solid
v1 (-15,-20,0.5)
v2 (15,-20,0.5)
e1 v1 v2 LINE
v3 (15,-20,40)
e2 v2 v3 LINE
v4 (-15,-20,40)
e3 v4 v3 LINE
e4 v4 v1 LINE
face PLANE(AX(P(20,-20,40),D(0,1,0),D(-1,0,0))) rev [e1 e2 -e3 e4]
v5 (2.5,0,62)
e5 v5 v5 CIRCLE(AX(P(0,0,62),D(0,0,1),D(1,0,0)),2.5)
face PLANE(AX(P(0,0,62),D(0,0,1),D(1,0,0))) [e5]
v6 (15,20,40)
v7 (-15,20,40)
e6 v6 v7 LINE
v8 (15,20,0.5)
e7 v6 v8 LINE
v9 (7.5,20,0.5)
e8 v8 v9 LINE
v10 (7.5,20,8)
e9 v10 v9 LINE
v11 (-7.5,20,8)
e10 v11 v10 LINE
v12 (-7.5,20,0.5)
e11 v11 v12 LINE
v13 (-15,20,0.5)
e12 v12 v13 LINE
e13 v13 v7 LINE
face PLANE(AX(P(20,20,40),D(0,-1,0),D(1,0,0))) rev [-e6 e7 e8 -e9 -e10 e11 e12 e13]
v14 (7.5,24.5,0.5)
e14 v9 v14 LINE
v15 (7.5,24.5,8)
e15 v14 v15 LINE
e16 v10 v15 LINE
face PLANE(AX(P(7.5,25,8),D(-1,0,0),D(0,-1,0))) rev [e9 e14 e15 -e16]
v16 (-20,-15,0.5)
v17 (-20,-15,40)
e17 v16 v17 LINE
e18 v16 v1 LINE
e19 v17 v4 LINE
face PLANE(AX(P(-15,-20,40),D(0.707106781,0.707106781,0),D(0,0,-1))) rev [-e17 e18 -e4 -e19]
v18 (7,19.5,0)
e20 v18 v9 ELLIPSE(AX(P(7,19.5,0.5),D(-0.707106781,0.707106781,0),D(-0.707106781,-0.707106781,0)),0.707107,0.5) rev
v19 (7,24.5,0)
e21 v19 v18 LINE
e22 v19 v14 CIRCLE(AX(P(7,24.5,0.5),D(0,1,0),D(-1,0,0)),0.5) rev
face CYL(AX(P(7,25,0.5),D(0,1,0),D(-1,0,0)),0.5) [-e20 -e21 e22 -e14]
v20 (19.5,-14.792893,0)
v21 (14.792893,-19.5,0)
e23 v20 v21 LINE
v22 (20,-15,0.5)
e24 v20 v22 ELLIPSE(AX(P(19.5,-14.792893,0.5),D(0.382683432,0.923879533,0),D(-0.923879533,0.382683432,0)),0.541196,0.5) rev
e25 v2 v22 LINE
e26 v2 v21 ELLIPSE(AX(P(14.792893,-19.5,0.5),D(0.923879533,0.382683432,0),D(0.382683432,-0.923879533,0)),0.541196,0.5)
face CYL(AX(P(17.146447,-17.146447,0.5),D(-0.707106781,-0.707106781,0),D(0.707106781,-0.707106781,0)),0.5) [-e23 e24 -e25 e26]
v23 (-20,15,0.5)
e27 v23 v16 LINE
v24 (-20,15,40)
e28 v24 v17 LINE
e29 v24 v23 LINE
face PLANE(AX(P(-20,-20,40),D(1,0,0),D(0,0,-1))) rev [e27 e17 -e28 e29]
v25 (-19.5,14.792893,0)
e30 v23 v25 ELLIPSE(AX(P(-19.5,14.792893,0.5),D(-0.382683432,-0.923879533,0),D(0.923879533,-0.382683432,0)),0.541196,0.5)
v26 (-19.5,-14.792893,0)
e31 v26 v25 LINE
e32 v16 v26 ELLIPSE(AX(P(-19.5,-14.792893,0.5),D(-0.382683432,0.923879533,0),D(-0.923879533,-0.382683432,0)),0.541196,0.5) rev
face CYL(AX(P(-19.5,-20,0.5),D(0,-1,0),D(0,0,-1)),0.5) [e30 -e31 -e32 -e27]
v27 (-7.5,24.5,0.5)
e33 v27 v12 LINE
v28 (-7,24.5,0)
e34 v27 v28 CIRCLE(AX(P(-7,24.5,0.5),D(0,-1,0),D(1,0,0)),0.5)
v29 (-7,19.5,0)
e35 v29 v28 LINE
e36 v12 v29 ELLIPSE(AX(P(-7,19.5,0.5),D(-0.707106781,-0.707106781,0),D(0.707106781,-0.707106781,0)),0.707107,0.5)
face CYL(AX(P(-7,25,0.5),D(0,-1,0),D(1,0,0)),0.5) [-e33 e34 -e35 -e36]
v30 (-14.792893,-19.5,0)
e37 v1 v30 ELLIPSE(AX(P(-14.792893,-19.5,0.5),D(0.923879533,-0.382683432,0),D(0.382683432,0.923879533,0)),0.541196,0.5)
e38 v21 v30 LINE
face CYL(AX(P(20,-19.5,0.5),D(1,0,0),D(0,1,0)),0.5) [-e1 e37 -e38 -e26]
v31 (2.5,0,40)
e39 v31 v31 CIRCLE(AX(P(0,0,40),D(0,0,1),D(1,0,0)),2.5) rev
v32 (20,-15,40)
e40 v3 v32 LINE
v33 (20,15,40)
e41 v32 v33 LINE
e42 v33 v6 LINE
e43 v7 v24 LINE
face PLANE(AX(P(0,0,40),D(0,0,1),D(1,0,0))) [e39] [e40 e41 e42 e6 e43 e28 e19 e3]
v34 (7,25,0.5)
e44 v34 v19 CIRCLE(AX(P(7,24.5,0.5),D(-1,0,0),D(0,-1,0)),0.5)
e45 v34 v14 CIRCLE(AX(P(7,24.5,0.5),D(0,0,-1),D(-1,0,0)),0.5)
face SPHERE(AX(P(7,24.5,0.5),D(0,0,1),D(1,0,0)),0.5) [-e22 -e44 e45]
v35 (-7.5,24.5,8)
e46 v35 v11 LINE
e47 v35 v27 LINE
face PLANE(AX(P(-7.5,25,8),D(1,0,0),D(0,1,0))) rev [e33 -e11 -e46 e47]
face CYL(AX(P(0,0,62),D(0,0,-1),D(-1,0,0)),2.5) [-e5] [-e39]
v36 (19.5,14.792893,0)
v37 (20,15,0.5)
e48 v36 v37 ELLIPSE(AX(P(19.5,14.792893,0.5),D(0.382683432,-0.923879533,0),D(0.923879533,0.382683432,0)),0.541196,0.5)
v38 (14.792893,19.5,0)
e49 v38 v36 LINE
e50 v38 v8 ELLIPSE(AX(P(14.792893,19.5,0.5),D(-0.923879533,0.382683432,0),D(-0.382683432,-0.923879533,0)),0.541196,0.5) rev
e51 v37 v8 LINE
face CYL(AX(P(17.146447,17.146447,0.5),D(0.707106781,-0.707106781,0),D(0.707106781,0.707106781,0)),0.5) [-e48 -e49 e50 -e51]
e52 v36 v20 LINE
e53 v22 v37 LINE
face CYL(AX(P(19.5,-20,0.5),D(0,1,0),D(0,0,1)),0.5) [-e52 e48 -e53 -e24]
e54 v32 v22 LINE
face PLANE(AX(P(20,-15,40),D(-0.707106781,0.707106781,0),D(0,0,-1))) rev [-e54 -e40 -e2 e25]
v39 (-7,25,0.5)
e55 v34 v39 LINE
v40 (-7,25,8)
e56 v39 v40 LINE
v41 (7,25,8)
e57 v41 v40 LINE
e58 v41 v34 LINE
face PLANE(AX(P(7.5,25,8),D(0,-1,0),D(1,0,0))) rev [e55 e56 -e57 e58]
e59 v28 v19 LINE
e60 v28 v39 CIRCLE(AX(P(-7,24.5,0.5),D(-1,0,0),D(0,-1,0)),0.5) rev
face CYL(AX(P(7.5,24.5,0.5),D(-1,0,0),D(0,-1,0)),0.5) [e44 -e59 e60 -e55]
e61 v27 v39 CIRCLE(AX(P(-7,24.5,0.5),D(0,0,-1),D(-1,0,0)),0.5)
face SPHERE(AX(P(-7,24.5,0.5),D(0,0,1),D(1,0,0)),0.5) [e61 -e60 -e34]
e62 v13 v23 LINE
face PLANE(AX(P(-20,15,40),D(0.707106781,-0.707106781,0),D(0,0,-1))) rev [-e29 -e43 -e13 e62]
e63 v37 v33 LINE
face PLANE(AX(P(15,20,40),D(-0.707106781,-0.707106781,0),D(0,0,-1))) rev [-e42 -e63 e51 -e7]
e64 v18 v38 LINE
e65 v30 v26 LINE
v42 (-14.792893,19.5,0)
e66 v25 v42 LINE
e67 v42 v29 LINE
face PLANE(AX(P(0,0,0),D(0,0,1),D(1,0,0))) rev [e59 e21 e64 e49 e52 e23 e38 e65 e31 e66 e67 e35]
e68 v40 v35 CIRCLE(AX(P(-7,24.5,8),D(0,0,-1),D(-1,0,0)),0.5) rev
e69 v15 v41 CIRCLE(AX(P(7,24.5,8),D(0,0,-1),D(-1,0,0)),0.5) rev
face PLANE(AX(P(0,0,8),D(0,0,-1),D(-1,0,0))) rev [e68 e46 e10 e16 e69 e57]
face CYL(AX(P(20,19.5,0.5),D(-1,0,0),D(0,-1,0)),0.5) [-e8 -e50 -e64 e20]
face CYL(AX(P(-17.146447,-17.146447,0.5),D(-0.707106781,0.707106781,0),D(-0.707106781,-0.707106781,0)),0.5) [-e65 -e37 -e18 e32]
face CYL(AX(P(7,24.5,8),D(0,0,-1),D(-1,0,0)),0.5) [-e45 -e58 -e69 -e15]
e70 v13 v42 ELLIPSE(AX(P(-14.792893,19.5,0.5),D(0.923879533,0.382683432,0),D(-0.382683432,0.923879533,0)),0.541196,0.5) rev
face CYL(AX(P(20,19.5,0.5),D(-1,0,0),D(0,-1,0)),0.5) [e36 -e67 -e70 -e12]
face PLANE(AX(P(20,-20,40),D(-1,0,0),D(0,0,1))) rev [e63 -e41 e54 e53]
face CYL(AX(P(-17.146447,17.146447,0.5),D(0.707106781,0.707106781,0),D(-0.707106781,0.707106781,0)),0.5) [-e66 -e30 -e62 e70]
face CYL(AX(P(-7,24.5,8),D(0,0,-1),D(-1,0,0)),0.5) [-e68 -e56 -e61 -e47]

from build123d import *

# Parameters (mm, degrees)
SKETCH1_W           = 40
SKETCH1_H           = 40
BOSS_EXTRUDE1_DEPTH = 40
CHAMFER1_SIZE       = 5
SKETCH2_W           = 15
SKETCH2_H           = 5
BOSS_EXTRUDE2_DEPTH = 8
FILLET1_R           = 0.5
FILLET2_R           = 0.5
SKETCH3_R           = 2.5
BOSS_EXTRUDE3_DEPTH = 62


with BuildPart() as part:
    # Sketch1 → Boss-Extrude1 (new body)
    with BuildSketch(Plane.XY):
        Rectangle(SKETCH1_W, SKETCH1_H)
    extrude(amount=BOSS_EXTRUDE1_DEPTH)

    # Chamfer1
    chamfer1_edges = [part.edges().sort_by_distance(p)[0] for p in [
        (-20, 20, 20),
        (20, 20, 20),
        (20, -20, 20),
        (-20, -20, 20),
    ]]
    chamfer(chamfer1_edges, length=CHAMFER1_SIZE)

    # Sketch2 → Boss-Extrude2 (add)
    with BuildSketch(Plane.XY):
        with Locations((0, 22.5)):
            Rectangle(SKETCH2_W, SKETCH2_H)
    extrude(amount=BOSS_EXTRUDE2_DEPTH)

    # Fillet1
    fillet1_edges = [part.edges().sort_by_distance(p)[0] for p in [
        (0, -20, 0),
        (-20, 0, 0),
        (11.25, 20, 0),
        (20, 0, 0),
        (17.5, 17.5, 0),
        (-17.5, 17.5, 0),
        (17.5, -17.5, 0),
        (-17.5, -17.5, 0),
        (-11.25, 20, 0),
        (-7.5, 22.5, 0),
        (7.5, 22.5, 0),
        (0, 25, 0),
    ]]
    fillet(fillet1_edges, radius=FILLET1_R)

    # Fillet2
    # the kernel refuses this fillet: 0.5 mm, written as the material it takes off along each edge
    with BuildSketch(Plane(origin=(-7, 24.5, 0.5), x_dir=(0, 1, 0), z_dir=(-1, 0, 0))) as fillet2_piece_1_section:
        Polygon((0, 0), (FILLET2_R, 0), (FILLET2_R, FILLET2_R), (0, FILLET2_R), align=None)
    fillet2_piece_1 = extrude(amount=FILLET2_R, mode=Mode.PRIVATE)
    fillet2_piece_1 = fillet2_piece_1 - Plane(origin=(-7, 24.5, 0.5), x_dir=(0, -0.7071067811865475, 0.7071067811865475), z_dir=(-1, 0, 0)) * Sphere(FILLET2_R, mode=Mode.PRIVATE)
    add(fillet2_piece_1, mode=Mode.SUBTRACT)
    with BuildSketch(Plane(origin=(7, 24.5, 0.5), x_dir=(0, 1, 0), z_dir=(1, 0, 0))) as fillet2_piece_2_section:
        Polygon((0, 0), (FILLET2_R, 0), (FILLET2_R, -FILLET2_R), (0, -FILLET2_R), align=None)
    fillet2_piece_2 = extrude(amount=FILLET2_R, mode=Mode.PRIVATE)
    fillet2_piece_2 = fillet2_piece_2 - Plane(origin=(7, 24.5, 0.5), x_dir=(0, -0.7071067811865475, 0.7071067811865475), z_dir=(1, 0, 0)) * Sphere(FILLET2_R, mode=Mode.PRIVATE)
    add(fillet2_piece_2, mode=Mode.SUBTRACT)
    with BuildSketch(Plane(origin=(-7.5, 25, 0.5), x_dir=(0, -1, 0), z_dir=(0, 0, 1))) as fillet2_piece_3:
        with BuildLine():
            CenterArc((FILLET2_R, FILLET2_R), FILLET2_R, 180, 90)
            Line((0, FILLET2_R), (0, 0))
            Line((0, 0), (FILLET2_R, 0))
        make_face()
    extrude(amount=8.75, mode=Mode.SUBTRACT)
    with BuildSketch(Plane(origin=(7.5, 25, 0.5), x_dir=(0, -1, 0), z_dir=(0, 0, 1))) as fillet2_piece_4:
        with BuildLine():
            CenterArc((FILLET2_R, -FILLET2_R), FILLET2_R, 90, 90)
            Line((0, -FILLET2_R), (0, 0))
            Line((0, 0), (FILLET2_R, 0))
        make_face()
    extrude(amount=8.75, mode=Mode.SUBTRACT)

    # Sketch3 → Boss-Extrude3 (add)
    with BuildSketch(Plane.XY):
        Circle(SKETCH3_R)
    extrude(amount=BOSS_EXTRUDE3_DEPTH)


solid = part.part
